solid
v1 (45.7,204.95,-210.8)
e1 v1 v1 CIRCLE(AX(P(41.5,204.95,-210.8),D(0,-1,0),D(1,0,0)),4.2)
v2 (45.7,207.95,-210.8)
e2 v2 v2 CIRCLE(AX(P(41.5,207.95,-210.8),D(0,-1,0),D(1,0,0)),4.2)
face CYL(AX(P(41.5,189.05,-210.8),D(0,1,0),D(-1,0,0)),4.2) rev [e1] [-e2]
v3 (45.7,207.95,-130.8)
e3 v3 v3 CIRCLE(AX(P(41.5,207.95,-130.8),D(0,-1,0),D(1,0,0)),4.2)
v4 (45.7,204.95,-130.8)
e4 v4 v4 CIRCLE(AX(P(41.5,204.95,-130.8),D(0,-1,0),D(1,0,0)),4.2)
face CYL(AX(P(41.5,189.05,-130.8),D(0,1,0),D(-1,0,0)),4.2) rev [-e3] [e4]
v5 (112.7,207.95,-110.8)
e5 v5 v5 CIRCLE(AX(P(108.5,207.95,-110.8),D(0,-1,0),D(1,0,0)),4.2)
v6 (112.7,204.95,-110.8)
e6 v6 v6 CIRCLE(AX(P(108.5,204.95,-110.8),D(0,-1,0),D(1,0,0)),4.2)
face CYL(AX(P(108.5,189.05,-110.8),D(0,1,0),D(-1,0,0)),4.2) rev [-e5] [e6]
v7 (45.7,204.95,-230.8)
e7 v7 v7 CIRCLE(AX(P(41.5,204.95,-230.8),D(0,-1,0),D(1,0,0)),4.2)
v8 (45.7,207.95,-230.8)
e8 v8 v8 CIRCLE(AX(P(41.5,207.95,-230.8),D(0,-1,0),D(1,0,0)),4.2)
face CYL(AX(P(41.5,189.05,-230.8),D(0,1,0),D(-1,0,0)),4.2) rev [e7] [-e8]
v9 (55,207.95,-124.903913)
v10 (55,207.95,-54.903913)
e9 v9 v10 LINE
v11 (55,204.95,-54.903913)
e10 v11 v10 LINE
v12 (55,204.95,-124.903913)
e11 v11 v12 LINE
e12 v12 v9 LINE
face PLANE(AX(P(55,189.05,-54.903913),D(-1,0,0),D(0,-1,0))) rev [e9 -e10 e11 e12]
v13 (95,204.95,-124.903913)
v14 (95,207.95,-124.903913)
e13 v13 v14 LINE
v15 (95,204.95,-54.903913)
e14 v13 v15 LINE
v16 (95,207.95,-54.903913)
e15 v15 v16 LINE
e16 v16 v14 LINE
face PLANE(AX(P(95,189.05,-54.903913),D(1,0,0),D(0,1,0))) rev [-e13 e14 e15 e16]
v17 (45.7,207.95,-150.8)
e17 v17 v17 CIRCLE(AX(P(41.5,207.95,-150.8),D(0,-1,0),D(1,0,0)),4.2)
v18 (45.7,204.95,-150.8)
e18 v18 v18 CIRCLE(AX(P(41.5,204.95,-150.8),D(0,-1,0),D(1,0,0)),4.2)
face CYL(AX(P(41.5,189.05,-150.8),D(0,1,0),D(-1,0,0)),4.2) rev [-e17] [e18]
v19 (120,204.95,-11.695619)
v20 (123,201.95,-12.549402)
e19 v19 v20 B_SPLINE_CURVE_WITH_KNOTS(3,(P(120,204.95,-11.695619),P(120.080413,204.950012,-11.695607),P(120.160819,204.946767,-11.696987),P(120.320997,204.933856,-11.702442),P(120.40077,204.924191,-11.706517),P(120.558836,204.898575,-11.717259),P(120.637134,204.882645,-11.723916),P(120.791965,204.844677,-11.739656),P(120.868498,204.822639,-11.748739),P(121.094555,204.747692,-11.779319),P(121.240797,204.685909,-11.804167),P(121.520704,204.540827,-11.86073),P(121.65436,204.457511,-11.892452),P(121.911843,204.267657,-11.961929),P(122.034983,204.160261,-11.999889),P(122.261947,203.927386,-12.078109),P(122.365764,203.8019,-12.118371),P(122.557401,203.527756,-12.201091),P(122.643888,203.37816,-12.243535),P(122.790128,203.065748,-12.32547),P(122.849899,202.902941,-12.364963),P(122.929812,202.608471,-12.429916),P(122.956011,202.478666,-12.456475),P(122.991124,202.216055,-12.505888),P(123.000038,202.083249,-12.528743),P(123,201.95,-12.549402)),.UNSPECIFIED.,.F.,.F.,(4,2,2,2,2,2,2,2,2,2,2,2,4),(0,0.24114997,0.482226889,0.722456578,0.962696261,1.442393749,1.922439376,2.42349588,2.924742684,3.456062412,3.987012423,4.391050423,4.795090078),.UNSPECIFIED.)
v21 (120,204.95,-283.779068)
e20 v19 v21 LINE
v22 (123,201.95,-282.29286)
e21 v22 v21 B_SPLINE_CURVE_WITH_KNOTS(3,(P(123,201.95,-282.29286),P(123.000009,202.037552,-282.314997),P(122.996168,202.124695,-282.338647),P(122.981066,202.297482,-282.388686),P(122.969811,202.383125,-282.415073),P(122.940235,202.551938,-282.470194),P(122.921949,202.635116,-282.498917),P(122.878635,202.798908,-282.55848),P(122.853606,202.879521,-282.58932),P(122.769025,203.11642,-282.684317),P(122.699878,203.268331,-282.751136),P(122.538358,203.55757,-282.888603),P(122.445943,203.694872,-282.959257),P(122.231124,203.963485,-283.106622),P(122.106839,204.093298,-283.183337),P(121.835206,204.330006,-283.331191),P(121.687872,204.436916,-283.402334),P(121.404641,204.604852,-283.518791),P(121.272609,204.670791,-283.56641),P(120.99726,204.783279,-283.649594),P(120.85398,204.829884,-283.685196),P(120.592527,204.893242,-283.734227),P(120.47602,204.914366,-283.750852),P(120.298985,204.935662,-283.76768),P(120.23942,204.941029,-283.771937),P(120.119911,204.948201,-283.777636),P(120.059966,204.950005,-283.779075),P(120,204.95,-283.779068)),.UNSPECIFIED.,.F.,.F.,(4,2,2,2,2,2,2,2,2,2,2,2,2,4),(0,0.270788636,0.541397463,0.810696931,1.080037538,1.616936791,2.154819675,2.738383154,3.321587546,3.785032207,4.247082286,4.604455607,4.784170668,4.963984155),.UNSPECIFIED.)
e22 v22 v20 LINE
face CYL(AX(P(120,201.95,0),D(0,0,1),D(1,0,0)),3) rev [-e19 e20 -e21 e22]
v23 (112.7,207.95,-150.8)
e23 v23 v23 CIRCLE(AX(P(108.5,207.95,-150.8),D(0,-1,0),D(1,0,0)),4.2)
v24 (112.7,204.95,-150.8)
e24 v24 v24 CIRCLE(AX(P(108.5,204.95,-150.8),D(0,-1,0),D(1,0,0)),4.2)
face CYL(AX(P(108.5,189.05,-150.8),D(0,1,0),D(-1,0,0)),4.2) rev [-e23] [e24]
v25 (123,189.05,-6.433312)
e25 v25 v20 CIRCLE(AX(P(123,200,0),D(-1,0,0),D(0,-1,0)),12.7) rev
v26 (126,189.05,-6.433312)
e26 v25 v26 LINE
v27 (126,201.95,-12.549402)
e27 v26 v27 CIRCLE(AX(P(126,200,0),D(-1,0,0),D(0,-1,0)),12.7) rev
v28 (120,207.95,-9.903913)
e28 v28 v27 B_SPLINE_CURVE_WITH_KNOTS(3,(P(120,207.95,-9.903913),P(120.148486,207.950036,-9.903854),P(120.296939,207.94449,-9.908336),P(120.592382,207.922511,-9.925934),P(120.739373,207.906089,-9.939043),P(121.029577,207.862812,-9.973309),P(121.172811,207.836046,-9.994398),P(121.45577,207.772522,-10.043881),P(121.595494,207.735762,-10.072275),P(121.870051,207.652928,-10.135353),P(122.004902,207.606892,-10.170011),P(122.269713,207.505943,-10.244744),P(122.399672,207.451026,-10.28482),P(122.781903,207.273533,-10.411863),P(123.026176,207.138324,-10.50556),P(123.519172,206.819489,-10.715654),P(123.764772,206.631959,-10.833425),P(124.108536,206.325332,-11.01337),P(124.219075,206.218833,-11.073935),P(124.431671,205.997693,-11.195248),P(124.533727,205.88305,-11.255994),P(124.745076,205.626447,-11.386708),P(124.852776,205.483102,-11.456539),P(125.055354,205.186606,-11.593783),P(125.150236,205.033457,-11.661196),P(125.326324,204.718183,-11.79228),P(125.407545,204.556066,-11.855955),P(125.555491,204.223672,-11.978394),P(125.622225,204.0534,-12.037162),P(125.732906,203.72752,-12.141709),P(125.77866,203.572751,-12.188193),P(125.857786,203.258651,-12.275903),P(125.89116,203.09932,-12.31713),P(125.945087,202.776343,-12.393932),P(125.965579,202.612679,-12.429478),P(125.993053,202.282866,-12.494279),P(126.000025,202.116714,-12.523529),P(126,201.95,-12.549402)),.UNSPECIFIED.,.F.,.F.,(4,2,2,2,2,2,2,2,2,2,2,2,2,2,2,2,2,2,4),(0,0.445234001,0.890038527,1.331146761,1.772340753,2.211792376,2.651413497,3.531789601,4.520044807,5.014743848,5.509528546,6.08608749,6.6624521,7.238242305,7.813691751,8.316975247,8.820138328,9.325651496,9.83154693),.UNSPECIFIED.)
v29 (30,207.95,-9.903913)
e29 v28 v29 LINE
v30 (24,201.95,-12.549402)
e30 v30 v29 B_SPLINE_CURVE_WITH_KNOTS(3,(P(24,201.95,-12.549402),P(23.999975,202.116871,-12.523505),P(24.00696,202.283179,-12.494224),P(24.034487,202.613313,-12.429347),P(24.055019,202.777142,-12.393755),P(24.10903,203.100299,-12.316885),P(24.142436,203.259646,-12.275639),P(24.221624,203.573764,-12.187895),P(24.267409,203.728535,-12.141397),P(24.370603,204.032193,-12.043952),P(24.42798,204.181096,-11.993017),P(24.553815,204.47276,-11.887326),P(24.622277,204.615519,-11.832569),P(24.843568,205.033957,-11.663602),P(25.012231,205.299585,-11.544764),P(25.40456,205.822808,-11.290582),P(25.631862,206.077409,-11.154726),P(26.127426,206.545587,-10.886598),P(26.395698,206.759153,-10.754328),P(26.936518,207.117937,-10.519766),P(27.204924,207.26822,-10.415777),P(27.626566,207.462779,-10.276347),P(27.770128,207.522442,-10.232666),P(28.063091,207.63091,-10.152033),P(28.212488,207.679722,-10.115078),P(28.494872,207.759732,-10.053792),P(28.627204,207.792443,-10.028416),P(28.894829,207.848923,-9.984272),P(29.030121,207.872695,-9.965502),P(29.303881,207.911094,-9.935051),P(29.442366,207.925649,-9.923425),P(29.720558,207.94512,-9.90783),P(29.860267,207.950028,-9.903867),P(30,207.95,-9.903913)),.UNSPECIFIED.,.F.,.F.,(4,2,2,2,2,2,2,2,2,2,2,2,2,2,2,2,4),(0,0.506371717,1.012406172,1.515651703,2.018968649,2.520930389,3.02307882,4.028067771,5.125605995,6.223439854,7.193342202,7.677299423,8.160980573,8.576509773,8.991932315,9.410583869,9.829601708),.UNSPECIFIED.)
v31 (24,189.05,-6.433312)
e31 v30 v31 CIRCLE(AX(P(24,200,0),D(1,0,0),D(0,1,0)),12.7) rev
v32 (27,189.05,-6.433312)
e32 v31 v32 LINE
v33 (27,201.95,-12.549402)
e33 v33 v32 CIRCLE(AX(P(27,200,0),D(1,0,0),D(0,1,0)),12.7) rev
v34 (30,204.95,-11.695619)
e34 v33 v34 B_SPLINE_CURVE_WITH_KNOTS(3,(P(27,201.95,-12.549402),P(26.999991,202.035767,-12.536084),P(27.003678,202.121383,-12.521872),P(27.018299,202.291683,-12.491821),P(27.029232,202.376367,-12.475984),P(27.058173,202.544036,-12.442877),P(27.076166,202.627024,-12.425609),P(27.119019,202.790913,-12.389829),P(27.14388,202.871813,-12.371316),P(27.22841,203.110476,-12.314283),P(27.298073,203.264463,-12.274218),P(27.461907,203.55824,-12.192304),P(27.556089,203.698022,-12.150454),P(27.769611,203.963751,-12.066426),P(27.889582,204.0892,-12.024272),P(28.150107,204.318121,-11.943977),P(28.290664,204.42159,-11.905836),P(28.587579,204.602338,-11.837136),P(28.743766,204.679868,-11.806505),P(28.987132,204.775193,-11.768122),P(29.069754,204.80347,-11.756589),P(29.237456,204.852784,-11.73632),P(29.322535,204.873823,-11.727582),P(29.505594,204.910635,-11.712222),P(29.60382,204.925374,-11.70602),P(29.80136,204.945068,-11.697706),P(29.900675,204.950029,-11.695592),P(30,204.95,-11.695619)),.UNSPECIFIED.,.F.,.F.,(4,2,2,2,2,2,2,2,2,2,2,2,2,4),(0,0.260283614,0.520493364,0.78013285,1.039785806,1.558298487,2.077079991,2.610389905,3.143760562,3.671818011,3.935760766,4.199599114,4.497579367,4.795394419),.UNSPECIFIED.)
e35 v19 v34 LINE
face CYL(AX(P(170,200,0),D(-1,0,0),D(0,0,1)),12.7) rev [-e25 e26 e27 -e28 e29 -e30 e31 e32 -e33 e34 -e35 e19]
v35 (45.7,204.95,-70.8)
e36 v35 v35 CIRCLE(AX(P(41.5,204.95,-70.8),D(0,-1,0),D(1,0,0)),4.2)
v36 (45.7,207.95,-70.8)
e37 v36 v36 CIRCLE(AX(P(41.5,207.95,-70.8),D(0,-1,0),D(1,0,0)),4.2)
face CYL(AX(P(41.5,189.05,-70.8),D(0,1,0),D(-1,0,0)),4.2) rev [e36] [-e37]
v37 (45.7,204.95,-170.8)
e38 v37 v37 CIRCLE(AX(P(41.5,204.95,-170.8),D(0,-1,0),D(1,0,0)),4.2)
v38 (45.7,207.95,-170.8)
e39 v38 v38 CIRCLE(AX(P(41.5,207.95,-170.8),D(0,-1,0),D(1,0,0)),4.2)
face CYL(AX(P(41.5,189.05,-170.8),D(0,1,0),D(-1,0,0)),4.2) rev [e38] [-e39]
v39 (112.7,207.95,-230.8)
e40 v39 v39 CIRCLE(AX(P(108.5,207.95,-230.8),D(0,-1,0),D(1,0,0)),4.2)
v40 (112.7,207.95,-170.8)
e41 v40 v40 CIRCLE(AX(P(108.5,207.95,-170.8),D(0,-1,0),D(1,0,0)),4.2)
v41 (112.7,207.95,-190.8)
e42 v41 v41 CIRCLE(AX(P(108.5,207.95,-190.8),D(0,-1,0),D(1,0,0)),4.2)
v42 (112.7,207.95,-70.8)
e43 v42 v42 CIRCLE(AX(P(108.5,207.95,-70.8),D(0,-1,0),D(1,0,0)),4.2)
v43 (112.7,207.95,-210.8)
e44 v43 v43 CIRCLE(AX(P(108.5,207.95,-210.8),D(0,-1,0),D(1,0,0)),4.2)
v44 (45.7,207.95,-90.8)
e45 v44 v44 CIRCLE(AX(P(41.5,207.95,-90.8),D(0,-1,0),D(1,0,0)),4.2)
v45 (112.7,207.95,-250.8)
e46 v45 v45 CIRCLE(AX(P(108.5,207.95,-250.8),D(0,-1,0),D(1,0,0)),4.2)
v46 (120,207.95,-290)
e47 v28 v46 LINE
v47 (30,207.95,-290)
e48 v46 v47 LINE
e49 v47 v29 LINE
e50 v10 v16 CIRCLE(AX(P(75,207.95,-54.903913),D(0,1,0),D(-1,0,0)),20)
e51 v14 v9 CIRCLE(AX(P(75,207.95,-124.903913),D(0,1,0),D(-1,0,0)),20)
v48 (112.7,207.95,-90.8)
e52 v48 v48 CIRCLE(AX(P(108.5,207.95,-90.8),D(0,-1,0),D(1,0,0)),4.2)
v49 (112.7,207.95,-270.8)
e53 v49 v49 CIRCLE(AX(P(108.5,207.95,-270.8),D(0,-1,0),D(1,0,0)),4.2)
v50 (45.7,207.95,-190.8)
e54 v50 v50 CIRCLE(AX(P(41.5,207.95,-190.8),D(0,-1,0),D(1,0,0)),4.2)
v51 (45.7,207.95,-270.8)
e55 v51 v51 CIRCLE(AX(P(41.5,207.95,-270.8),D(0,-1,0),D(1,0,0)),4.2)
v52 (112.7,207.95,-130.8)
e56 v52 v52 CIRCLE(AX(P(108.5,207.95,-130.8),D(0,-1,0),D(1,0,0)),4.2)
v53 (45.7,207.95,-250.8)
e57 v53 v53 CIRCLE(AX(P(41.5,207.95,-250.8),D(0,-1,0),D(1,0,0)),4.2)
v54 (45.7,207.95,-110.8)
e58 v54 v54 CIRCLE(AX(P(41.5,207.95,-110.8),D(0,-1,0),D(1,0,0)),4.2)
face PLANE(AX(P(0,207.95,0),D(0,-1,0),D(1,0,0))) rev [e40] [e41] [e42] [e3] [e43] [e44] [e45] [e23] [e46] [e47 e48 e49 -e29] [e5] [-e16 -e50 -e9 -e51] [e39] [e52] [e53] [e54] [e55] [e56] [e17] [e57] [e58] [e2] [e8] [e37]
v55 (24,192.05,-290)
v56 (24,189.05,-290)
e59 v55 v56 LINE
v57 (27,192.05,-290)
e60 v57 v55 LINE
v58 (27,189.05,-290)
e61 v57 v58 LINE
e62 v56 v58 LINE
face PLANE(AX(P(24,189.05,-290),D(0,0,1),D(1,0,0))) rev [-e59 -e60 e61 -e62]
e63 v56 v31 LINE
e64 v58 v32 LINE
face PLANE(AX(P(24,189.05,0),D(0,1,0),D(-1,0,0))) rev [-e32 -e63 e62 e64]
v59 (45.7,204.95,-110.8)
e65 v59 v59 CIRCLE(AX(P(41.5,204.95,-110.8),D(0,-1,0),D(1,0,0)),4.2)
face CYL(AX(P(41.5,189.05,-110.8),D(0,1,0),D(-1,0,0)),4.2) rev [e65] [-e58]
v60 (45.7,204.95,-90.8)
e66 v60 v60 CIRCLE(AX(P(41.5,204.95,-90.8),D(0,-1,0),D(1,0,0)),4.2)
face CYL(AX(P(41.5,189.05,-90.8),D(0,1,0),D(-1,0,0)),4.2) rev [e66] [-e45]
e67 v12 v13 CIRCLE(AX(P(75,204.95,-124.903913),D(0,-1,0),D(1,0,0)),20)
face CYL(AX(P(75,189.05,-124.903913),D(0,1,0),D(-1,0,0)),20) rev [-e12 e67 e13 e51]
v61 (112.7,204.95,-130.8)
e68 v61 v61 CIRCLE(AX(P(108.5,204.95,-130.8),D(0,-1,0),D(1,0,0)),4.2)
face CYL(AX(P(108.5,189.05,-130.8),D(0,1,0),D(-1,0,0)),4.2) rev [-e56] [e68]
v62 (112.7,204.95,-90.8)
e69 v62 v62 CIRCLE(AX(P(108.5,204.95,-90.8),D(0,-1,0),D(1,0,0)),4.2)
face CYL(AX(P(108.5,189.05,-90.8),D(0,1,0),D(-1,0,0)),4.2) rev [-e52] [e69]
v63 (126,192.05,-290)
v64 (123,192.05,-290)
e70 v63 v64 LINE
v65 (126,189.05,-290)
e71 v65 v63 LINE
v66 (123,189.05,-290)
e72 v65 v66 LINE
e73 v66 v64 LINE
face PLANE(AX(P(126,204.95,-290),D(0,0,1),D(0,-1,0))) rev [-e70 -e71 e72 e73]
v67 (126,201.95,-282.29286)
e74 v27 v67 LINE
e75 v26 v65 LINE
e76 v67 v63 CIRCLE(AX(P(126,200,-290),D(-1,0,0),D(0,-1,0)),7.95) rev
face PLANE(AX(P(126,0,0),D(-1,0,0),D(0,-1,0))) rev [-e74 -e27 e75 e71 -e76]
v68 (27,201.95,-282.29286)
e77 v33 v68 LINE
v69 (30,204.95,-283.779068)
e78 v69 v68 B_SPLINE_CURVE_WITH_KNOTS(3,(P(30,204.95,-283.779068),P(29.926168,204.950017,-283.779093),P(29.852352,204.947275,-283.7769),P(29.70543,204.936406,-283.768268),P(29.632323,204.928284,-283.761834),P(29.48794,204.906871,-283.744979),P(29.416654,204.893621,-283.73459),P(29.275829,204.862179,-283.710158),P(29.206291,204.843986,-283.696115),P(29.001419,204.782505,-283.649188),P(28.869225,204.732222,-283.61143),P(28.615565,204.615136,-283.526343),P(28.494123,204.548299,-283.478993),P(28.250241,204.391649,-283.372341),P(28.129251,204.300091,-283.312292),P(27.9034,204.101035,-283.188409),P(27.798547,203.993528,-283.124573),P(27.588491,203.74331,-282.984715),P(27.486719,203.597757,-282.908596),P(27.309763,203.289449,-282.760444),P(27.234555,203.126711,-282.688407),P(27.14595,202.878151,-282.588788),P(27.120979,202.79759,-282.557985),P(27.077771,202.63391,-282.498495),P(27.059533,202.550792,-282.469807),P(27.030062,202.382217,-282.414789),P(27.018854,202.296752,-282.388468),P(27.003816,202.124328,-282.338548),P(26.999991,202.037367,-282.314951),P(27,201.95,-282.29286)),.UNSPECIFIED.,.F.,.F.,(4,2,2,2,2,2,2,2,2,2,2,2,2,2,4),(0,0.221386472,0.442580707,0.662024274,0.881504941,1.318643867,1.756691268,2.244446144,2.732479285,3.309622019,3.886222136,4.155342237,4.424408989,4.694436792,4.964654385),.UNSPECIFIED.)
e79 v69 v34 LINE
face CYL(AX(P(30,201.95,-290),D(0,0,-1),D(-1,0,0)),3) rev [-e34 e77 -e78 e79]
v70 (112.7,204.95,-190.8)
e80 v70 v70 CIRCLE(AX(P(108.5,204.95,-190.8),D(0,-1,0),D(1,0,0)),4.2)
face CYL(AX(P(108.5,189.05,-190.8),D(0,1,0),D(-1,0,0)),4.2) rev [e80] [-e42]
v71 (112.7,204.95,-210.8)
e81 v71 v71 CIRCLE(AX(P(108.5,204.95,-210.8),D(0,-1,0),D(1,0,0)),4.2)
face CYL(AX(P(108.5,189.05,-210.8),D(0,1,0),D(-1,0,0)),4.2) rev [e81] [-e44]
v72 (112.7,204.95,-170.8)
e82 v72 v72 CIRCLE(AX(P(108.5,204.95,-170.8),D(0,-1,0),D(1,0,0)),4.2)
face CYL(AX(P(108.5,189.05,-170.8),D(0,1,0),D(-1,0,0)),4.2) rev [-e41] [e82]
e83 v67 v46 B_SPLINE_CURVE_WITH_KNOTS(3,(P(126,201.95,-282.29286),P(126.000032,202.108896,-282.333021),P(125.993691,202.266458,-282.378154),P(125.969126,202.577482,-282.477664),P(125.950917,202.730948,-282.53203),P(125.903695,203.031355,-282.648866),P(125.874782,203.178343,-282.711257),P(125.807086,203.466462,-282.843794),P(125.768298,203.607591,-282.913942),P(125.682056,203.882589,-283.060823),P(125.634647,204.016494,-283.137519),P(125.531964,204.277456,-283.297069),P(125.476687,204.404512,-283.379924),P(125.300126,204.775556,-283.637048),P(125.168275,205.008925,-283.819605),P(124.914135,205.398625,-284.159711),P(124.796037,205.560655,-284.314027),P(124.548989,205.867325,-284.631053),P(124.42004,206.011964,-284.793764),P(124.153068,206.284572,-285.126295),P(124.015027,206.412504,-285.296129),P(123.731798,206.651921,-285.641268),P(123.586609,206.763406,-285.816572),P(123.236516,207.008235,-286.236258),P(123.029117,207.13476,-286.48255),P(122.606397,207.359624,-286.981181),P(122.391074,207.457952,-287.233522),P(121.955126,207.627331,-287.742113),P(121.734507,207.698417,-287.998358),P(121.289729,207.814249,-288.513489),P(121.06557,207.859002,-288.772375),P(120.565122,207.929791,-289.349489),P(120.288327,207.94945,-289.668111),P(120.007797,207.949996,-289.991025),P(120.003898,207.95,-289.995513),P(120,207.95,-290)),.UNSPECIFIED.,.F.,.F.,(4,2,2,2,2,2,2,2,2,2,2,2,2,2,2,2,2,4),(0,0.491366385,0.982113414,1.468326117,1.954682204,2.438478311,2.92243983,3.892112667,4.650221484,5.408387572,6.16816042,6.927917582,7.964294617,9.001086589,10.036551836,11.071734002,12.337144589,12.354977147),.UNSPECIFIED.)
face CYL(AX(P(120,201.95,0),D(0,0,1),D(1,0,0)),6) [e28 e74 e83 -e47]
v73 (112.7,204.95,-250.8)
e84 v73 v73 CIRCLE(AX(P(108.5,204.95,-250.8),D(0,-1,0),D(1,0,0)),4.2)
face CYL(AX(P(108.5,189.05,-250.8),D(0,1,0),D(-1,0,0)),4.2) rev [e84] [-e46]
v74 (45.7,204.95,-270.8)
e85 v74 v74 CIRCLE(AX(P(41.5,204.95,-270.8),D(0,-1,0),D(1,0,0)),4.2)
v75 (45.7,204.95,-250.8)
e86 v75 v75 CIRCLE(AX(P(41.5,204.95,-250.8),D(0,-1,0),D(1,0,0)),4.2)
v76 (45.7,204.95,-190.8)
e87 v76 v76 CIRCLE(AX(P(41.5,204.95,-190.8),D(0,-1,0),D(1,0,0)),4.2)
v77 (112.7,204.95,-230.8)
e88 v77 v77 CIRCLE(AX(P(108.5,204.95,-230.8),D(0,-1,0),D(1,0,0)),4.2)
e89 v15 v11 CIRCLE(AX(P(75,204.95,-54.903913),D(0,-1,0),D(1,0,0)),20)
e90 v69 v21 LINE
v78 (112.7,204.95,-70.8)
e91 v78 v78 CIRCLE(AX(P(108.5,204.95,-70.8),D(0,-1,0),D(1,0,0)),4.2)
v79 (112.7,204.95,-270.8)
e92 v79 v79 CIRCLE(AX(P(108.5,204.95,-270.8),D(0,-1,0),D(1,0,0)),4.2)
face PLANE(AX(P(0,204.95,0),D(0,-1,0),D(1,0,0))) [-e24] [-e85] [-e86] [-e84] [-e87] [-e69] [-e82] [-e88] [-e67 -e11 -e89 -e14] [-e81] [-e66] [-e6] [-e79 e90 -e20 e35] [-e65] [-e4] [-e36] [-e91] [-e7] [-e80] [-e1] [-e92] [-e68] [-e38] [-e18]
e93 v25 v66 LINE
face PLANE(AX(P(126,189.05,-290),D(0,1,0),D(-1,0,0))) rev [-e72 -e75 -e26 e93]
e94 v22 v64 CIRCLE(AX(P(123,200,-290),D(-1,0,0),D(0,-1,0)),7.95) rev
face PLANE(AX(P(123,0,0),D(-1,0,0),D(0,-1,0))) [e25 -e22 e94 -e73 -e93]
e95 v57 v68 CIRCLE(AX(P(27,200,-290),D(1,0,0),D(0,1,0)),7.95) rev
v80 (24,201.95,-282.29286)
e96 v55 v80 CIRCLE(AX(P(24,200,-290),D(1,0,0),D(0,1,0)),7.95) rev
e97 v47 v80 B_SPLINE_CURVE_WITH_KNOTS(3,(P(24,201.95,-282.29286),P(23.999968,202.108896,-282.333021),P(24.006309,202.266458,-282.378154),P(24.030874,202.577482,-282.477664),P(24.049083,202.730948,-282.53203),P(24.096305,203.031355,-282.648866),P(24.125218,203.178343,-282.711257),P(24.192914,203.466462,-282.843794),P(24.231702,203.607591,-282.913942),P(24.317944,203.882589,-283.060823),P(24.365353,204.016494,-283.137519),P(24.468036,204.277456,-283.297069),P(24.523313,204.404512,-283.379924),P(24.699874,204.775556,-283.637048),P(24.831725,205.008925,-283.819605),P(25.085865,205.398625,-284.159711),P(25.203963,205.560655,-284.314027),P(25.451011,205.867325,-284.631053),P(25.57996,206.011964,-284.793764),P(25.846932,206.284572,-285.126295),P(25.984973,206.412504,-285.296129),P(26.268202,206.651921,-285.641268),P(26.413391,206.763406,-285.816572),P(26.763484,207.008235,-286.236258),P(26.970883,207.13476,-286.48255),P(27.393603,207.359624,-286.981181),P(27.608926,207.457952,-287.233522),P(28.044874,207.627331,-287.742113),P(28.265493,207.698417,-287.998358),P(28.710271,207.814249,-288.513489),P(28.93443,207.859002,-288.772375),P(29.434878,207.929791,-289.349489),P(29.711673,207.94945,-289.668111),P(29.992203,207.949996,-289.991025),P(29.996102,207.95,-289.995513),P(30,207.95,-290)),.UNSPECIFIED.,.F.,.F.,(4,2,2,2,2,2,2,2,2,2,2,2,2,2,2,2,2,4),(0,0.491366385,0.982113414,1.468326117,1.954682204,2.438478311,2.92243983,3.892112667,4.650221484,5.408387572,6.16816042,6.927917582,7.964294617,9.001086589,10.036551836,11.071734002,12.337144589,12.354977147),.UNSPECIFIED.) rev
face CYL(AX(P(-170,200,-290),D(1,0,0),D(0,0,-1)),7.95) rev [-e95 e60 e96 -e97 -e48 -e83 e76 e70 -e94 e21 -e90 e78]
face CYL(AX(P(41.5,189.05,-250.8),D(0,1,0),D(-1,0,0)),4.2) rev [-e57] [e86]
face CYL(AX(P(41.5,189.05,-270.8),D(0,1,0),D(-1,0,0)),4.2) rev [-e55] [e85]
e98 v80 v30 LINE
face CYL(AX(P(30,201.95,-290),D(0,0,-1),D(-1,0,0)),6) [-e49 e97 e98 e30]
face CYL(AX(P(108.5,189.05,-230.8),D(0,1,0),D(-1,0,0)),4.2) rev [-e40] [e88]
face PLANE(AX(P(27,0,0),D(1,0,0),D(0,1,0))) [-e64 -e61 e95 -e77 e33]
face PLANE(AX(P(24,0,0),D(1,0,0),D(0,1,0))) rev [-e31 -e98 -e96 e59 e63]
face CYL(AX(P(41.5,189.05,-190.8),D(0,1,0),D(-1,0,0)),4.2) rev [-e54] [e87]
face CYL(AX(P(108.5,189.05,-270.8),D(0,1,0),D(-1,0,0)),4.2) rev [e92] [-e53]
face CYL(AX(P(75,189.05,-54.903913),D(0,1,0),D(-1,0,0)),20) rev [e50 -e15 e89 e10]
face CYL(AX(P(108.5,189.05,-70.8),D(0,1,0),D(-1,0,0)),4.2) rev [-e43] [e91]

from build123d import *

# Parameters (mm, degrees)
SKETCH1_W                   = 90
SKETCH1_H                   = 290
BASE_FLANGE1_DEPTH          = 3
SM_EDGE_FLANGE_1_DEPTH      = 290
SM_EDGE_FLANGE_1_BEND_DEPTH = 290
INDENT1_START               = 23
INDENT1_DEPTH               = 104
INDENT1_START_2             = 26.270388893
INDENT1_2_DEPTH             = 97.459222009
INDENT1_3_DEPTH             = 0.729611107
INDENT1_START_3             = 123
INDENT1_4_DEPTH             = 0.729610902
INDENT1_START_4             = 119.9999999
INDENT1_5_DEPTH             = 6.0000001
INDENT1_START_5             = 24
INDENT1_6_DEPTH             = 6
INDENT1_START_6             = -290
INDENT1_7_DEPTH             = 6.65
INDENT2_START               = 23
INDENT2_DEPTH               = 104
INDENT2_START_2             = -11.0000001
INDENT2_2_DEPTH             = 11.0000001
INDENT2_START_3             = 24
INDENT2_3_DEPTH             = 102
CUT_EXTRUDE1_DEPTH          = 317.754179273
CUT_EXTRUDE1_DEPTH_BACK     = 317.754179273
SKETCH15_R                  = 4.2
CUT_EXTRUDE2_DEPTH          = 317.754179273
CUT_EXTRUDE2_DEPTH_BACK     = 317.754179273


with BuildPart() as part:
    # Base-Flange1: sheet metal written as solids
    # Sketch1 → Base-Flange1 (new body)
    with BuildSketch(Plane(origin=(0, 207.95, 0), x_dir=(1, 0, 0), z_dir=(0, 1, 0))):
        with Locations((75, 145)):
            Rectangle(SKETCH1_W, SKETCH1_H)
    extrude(amount=-BASE_FLANGE1_DEPTH)

    # 邊線-凸緣1: sheet metal written as solids
    # 邊線-凸緣1 section (on a plane across the edge) → 邊線-凸緣1 (add)
    with BuildSketch(Plane(origin=(27, 204.95, 0), x_dir=(1, 0, 0), z_dir=(0, 0, -1))):
        with BuildLine():
            Line((-3, 3), (-3, 15.9))
            Line((-3, 15.9), (0, 15.9))
            Line((0, 15.9), (0, 3))
            ThreePointArc((0, 3), (0.878679656, 0.878679656), (3, 0))
            Line((3, 0), (3, -3))
            ThreePointArc((3, -3), (-1.242640687, -1.242640687), (-3, 3))
        make_face()
    extrude(amount=SM_EDGE_FLANGE_1_DEPTH)

    # 邊線-凸緣1 section 2 (on a plane across the edge) → 邊線-凸緣1 bend (add)
    with BuildSketch(Plane(origin=(123, 204.95, -290), x_dir=(-1, 0, 0), z_dir=(0, 0, 1))):
        with BuildLine():
            Line((-3, 3), (-3, 15.9))
            Line((-3, 15.9), (0, 15.9))
            Line((0, 15.9), (0, 3))
            ThreePointArc((0, 3), (0.878679656, 0.878679656), (3, 0))
            Line((3, 0), (3, -3))
            ThreePointArc((3, -3), (-1.242640687, -1.242640687), (-3, 3))
        make_face()
    extrude(amount=SM_EDGE_FLANGE_1_BEND_DEPTH)

    # Indent1: read off the stored shape, not the designer's step
    # Indent1 outline → Indent1 (cut)
    with BuildSketch(Plane.YZ.offset(INDENT1_START)):
        with BuildLine():
            Line((192.05, -290), (207.95, -290))
            ThreePointArc((207.95, -290), (200, -282.05), (192.05, -290))
        make_face()
    extrude(amount=INDENT1_DEPTH, mode=Mode.SUBTRACT)

    # Indent2: read off the stored shape, not the designer's step
    # Indent2 outline → Indent2 (cut)
    with BuildSketch(Plane.YZ.offset(INDENT2_START)):
        with BuildLine():
            ThreePointArc((189.05, -6.433311744), (197.7062633, -12.491147744), (207.950014124, -9.903902031))
            Line((207.950014124, -9.903902031), (209, -9.061062257))
            Line((209, -9.061062257), (209, 1))
            Line((209, 1), (188, 1))
            Line((188, 1), (188, 0))
            Line((188, 0), (188, -4.64612958))
            Line((188, -4.64612958), (189.05, -6.433311744))
        make_face()
    extrude(amount=INDENT2_DEPTH, mode=Mode.SUBTRACT)

    # Sketch15 → Cut-Extrude1 (cut, two sides: drawn at the far end of the back side and taken through both)
    with BuildSketch(Plane(origin=(0, 207.95, 0), x_dir=(1, 0, 0), z_dir=(0, 1, 0)).offset(-CUT_EXTRUDE1_DEPTH_BACK)):
        with Locations((41.5, 270.8)):
            Circle(SKETCH15_R)
        with Locations((108.5, 270.8)):
            Circle(SKETCH15_R)
        with Locations((41.5, 250.8)):
            Circle(SKETCH15_R)
        with Locations((108.5, 250.8)):
            Circle(SKETCH15_R)
        with Locations((41.5, 230.8)):
            Circle(SKETCH15_R)
        with Locations((108.5, 230.8)):
            Circle(SKETCH15_R)
        with Locations((41.5, 210.8)):
            Circle(SKETCH15_R)
        with Locations((108.5, 210.8)):
            Circle(SKETCH15_R)
        with Locations((41.5, 190.8)):
            Circle(SKETCH15_R)
        with Locations((108.5, 190.8)):
            Circle(SKETCH15_R)
        with Locations((41.5, 170.8)):
            Circle(SKETCH15_R)
        with Locations((108.5, 170.8)):
            Circle(SKETCH15_R)
        with Locations((41.5, 150.8)):
            Circle(SKETCH15_R)
        with Locations((108.5, 150.8)):
            Circle(SKETCH15_R)
        with Locations((41.5, 130.8)):
            Circle(SKETCH15_R)
        with Locations((108.5, 130.8)):
            Circle(SKETCH15_R)
        with Locations((41.5, 110.8)):
            Circle(SKETCH15_R)
        with Locations((108.5, 110.8)):
            Circle(SKETCH15_R)
        with Locations((41.5, 90.8)):
            Circle(SKETCH15_R)
        with Locations((108.5, 90.8)):
            Circle(SKETCH15_R)
        with Locations((41.5, 70.8)):
            Circle(SKETCH15_R)
        with Locations((108.5, 70.8)):
            Circle(SKETCH15_R)
    extrude(amount=CUT_EXTRUDE1_DEPTH + CUT_EXTRUDE1_DEPTH_BACK, mode=Mode.SUBTRACT)

    # Sketch16 → Cut-Extrude2 (cut, two sides: drawn at the far end of the back side and taken through both)
    with BuildSketch(Plane(origin=(0, 207.95, 0), x_dir=(1, 0, 0), z_dir=(0, 1, 0)).offset(-CUT_EXTRUDE2_DEPTH_BACK)):
        with BuildLine():
            Line((55, 54.903913368), (55, 124.903913368))
            ThreePointArc((55, 124.903913368), (75, 144.903913368), (95, 124.903913368))
            Line((95, 124.903913368), (95, 54.903913368))
            ThreePointArc((95, 54.903913368), (75, 34.903913368), (55, 54.903913368))
        make_face()
    extrude(amount=CUT_EXTRUDE2_DEPTH + CUT_EXTRUDE2_DEPTH_BACK, mode=Mode.SUBTRACT)


with BuildPart() as body_2:
    # Indent1 2 outline → Indent1 2 (new body)
    with BuildSketch(Plane.YZ.offset(INDENT1_START_2)):
        with BuildLine():
            Line((204.95, -285.559279338), (204.95, -290))
            Line((204.95, -290), (206.65, -290))
            ThreePointArc((206.65, -290), (206.210475022, -287.622501314), (204.95, -285.559279338))
        make_face()
    extrude(amount=INDENT1_2_DEPTH)

    # Indent1 3 outline → Indent1 3 (add)
    with BuildSketch(Plane.YZ.offset(INDENT1_START_2)):
        with BuildLine():
            Line((193.35, -290), (204.95, -290))
            Line((204.95, -290), (204.95, -285.559279338))
            ThreePointArc((204.95, -285.559279338), (197.622501314, -283.789524978), (193.35, -290))
        make_face()
    extrude(amount=INDENT1_3_DEPTH)

    # Indent1 4 outline → Indent1 4 (add)
    with BuildSketch(Plane.YZ.offset(INDENT1_START_3)):
        with BuildLine():
            Line((193.35, -290), (204.95, -290))
            Line((204.95, -290), (204.95, -285.559279338))
            ThreePointArc((204.95, -285.559279338), (197.622501314, -283.789524978), (193.35, -290))
        make_face()
    extrude(amount=INDENT1_4_DEPTH)

    # Indent1 5 outline → Indent1 5 (add)
    with BuildSketch(Plane.YZ.offset(INDENT1_START_4)):
        with BuildLine():
            Line((193.35, -290), (206.65, -290))
            ThreePointArc((206.65, -290), (200, -283.35), (193.35, -290))
        make_face()
    extrude(amount=INDENT1_5_DEPTH)

    # Indent1 6 outline → Indent1 6 (add)
    with BuildSketch(Plane.YZ.offset(INDENT1_START_5)):
        with BuildLine():
            Line((193.35, -290), (206.65, -290))
            ThreePointArc((206.65, -290), (200, -283.35), (193.35, -290))
        make_face()
    extrude(amount=INDENT1_6_DEPTH)

    # Indent1 7 outline → Indent1 7 (cut)
    with BuildSketch(Plane.XY.offset(INDENT1_START_6)):
        with BuildLine():
            Line((123, 192), (123, 201.95))
            ThreePointArc((123, 201.95), (122.121320344, 204.071320344), (120, 204.95))
            Line((120, 204.95), (119.9999999, 192))
            Line((119.9999999, 192), (123, 192))
        make_face()
        with BuildLine():
            Line((27, 192), (30, 192))
            Line((30, 192), (30, 204.95))
            ThreePointArc((30, 204.95), (27.878679656, 204.071320344), (27, 201.95))
            Line((27, 201.95), (27, 192))
        make_face()
        with BuildLine():
            ThreePointArc((123.729603466, 206.650006169), (125.402666971, 204.559825589), (126, 201.95))
            Line((126, 201.95), (126, 208))
            Line((126, 208), (122.028355761, 208))
            Line((122.028355761, 208), (123.729603466, 206.650006169))
        make_face()
        with BuildLine():
            Line((24, 208), (24, 201.95))
            ThreePointArc((24, 201.95), (24.597331636, 204.559822705), (26.270391517, 206.650002187))
            Line((26.270391517, 206.650002187), (27.971640511, 208))
            Line((27.971640511, 208), (24, 208))
        make_face()
    extrude(amount=INDENT1_7_DEPTH, mode=Mode.SUBTRACT)


with BuildPart() as body_3:
    # Indent2 2 outline → Indent2 2 (new body)
    with BuildSketch(Plane.XY.offset(INDENT2_START_2)):
        with BuildLine():
            Line((24, 201.95), (24, 189.05))
            Line((24, 189.05), (27, 189.05))
            Line((27, 189.05), (27, 201.95))
            ThreePointArc((27, 201.95), (27.878679656, 204.071320344), (30, 204.95))
            Line((30, 204.95), (120, 204.95))
            ThreePointArc((120, 204.95), (122.121320344, 204.071320344), (123, 201.95))
            Line((123, 201.95), (123, 189.05))
            Line((123, 189.05), (126, 189.05))
            Line((126, 189.05), (126, 201.95))
            ThreePointArc((126, 201.95), (124.242640687, 206.192640687), (120, 207.95))
            Line((120, 207.95), (30, 207.95))
            ThreePointArc((30, 207.95), (25.757359313, 206.192640687), (24, 201.95))
        make_face()
    extrude(amount=INDENT2_2_DEPTH)

    # Indent2 3 outline → Indent2 3 (cut)
    with BuildSketch(Plane.YZ.offset(INDENT2_START_3)):
        with BuildLine():
            Line((207.95, -11.0000001), (207.950016725, -7.602449216))
            ThreePointArc((207.950016725, -7.602449216), (204.322791843, -10.115012145), (200.000000001, -11))
            Line((200.000000001, -11), (207.95, -11.0000001))
        make_face()
        with BuildLine():
            Line((189.05, -11.0000001), (200.000000001, -11))
            ThreePointArc((200.000000001, -11), (192.601479194, -8.140140655), (189.05, -1.047616342))
            Line((189.05, -1.047616342), (189.05, -11.0000001))
        make_face()
    extrude(amount=INDENT2_3_DEPTH, mode=Mode.SUBTRACT)


solid = part.part
